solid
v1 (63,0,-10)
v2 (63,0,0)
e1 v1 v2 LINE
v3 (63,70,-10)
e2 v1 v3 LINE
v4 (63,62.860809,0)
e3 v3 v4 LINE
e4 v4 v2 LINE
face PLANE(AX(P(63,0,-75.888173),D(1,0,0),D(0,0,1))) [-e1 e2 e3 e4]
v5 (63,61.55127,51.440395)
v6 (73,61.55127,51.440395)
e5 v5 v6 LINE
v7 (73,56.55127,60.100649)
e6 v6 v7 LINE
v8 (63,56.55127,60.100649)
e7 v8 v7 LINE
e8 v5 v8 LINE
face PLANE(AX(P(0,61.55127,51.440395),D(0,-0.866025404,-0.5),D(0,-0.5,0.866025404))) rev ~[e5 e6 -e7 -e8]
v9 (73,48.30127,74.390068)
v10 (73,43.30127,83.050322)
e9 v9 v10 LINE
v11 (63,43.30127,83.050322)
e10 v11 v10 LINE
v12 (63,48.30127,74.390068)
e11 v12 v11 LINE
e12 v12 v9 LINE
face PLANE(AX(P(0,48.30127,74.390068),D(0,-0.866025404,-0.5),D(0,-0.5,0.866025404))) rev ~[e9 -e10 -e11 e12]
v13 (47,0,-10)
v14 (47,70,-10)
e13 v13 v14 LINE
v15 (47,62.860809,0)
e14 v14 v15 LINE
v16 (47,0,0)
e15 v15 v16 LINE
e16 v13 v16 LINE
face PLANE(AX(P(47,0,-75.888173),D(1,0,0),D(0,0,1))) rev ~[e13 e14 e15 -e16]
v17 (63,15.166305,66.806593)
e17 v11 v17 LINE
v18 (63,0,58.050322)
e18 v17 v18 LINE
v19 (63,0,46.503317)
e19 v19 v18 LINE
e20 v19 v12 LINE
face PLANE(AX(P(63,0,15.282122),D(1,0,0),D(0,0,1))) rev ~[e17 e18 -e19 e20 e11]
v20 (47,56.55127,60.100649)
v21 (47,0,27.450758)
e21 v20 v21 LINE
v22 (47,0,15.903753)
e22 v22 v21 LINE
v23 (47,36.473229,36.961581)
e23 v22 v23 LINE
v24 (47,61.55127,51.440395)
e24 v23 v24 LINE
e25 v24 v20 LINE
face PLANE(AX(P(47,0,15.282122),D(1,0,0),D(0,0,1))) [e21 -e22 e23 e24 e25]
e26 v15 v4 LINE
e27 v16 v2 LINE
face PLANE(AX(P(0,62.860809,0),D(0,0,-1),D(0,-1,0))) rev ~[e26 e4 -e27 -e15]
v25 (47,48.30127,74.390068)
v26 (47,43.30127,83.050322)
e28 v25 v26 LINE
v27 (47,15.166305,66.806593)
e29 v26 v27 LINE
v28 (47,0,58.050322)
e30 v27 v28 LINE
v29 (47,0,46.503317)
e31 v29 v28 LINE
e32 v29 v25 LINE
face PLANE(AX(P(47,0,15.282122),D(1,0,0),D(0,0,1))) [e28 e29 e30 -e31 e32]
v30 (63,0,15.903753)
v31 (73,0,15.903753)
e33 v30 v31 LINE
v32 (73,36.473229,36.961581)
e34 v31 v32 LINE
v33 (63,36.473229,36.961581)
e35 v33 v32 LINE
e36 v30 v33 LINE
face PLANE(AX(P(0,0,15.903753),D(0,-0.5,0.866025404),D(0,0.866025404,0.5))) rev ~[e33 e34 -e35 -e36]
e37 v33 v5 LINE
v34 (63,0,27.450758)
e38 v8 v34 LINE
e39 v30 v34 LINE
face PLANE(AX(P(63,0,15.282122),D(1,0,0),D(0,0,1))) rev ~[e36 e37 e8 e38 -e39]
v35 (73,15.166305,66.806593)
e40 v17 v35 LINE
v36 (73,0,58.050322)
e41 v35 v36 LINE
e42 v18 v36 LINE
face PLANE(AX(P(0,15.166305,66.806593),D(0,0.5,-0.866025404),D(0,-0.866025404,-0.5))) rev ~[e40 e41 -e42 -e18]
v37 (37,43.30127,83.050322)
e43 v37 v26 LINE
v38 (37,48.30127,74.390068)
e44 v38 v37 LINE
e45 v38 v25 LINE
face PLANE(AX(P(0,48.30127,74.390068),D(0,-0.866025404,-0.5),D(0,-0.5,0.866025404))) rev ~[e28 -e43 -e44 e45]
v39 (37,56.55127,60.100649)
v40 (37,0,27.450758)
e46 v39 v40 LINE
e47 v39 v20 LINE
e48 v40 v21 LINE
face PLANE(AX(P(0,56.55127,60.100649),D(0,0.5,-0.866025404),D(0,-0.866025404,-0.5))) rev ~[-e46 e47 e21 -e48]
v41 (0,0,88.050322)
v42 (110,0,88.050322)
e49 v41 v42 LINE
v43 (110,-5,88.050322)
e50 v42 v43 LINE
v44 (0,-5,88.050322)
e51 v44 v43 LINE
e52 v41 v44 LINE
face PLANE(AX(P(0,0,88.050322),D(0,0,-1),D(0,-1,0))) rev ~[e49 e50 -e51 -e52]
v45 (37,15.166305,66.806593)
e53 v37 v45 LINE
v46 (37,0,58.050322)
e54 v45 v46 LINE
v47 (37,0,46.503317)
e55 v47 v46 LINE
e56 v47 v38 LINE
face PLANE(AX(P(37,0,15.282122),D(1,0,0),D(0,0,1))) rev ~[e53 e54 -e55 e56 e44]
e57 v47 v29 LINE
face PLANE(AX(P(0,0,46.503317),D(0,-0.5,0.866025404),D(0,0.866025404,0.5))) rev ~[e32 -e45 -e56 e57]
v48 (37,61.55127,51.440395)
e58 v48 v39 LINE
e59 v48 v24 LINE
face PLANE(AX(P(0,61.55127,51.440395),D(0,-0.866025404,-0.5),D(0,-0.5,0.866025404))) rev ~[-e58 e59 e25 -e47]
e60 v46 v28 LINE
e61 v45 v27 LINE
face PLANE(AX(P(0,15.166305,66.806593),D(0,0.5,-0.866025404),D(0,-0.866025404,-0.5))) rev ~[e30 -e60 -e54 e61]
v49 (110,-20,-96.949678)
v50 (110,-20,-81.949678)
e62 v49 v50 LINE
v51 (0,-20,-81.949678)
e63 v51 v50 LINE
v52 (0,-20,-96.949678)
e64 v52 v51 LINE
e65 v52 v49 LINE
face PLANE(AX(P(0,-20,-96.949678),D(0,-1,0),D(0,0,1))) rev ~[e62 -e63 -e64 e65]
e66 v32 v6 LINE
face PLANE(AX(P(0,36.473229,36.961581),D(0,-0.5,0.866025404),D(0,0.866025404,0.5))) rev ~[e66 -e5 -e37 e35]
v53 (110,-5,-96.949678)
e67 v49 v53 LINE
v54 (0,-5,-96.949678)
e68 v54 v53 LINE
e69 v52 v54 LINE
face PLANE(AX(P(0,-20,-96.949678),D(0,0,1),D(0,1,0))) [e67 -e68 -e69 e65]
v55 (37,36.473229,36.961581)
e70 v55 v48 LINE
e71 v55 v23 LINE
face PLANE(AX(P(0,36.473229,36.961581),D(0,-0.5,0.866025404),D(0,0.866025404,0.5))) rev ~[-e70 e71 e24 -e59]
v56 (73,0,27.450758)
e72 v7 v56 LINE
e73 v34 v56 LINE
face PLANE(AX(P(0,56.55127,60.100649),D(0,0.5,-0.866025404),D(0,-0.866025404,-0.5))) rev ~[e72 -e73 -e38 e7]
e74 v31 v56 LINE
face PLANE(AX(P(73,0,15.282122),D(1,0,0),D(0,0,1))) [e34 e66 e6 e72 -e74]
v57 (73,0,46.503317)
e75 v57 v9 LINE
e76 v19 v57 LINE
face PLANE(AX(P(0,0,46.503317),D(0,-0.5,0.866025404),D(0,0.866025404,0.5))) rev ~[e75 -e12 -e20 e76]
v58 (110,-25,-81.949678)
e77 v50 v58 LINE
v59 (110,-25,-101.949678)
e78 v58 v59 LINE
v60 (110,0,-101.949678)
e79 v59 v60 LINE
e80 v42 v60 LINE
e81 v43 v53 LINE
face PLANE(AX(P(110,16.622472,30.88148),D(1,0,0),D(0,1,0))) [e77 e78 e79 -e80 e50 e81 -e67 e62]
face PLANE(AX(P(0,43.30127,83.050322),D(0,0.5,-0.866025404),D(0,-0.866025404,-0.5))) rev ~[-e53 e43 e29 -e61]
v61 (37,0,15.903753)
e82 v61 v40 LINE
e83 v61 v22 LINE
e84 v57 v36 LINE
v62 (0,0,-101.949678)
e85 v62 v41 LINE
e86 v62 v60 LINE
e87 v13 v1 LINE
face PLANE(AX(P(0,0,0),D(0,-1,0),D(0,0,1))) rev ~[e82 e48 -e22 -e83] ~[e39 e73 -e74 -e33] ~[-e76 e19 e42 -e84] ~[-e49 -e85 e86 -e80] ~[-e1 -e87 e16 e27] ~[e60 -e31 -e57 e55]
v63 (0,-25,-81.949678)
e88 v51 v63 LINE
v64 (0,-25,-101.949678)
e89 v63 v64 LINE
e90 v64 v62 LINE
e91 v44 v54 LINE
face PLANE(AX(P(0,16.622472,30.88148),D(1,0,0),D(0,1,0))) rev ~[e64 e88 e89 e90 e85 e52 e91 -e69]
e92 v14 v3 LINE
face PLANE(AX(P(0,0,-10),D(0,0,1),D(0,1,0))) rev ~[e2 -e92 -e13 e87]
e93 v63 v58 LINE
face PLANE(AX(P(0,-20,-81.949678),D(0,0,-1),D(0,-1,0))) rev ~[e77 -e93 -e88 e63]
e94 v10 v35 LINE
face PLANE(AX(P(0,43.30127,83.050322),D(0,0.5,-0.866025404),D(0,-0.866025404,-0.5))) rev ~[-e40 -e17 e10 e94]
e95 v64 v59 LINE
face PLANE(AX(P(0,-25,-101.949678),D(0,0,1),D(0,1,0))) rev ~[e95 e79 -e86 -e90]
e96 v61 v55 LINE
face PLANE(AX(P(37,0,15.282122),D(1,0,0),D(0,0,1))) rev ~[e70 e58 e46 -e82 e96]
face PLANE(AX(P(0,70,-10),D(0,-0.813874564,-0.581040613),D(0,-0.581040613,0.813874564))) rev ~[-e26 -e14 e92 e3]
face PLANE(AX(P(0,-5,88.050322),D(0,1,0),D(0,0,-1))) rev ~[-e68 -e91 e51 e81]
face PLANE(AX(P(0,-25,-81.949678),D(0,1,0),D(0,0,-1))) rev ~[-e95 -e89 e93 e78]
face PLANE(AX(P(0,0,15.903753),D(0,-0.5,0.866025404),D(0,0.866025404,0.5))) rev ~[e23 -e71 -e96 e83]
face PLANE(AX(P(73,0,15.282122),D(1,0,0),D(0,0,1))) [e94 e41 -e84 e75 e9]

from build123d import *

# Parameters (mm, degrees)
F0_W     = 15
F0_H     = 5
F1_DEPTH = 110
F2_W     = 8
F2_H     = 98.8297045976
F2_W_2   = 37
F2_H_2   = 91.1702954024
F2_W_3   = 10
F3_DEPTH = 100


# Not quite as in the source:
# - a feature of the source that left no trace in its solid (it failed there, or was rolled back) is left out


with BuildPart() as f1:
    # F0 (on Right) → F1 (new body)
    with BuildSketch(Plane.YZ):
        Polygon((30.635715595, 45.1382968587), (0, 27.4507582131), (0, 15.9037528294), (36.4732290688, 36.9615814504), align=None)
        Polygon((56.5512701892, 60.1006492799), (30.635715595, 45.1382968587), (36.4732290688, 36.9615814504), (61.5512701892, 51.4403952421), align=None)
        Polygon((15.1663048896, 66.8065926908), (0, 58.0503224802), (0, 46.5033170964), (21.0038183633, 58.6298772825), align=None)
        Polygon((43.3012701892, 83.0503224802), (15.1663048896, 66.8065926908), (21.0038183633, 58.6298772825), (48.3012701892, 74.3900684424), align=None)
        Polygon((-20, -101.9496775198), (-20, -96.9496775198), (-20, -81.9496775198), (-25, -81.9496775198), (-25, -101.9496775198), align=None)
        with Locations((-12.5, -99.4496775198)):
            Rectangle(F0_W, F0_H)
        Polygon((0, 88.0503224802), (-5, 88.0503224802), (-5, -96.9496775198), (-5, -101.9496775198), (0, -101.9496775198), (0, -10), (0, 0), (0, 15.9037528294), (0, 27.4507582131), (0, 46.5033170964), (0, 58.0503224802), align=None)
        Polygon((0, 0), (0, -10), (70, -10), (62.860808794, 0), align=None)
    extrude(amount=F1_DEPTH)

    # F2 (on Front) → F3 (cut)
    with BuildSketch(Plane.XZ):
        with Locations((51, 64.6969747171)):
            Rectangle(F2_W, F2_H)
        with Locations((59, 64.6969747171)):
            Rectangle(F2_W, F2_H)
        with Locations((91.5, -30.3030252829)):
            Rectangle(F2_W_2, F2_H_2)
        with Locations((18.5, -30.3030252829)):
            Rectangle(F2_W_2, F2_H_2)
        with Locations((42, -30.3030252829)):
            Rectangle(F2_W_3, F2_H_2)
        with Locations((68, -30.3030252829)):
            Rectangle(F2_W_3, F2_H_2)
        with Locations((91.5, 64.6969747171)):
            Rectangle(F2_W_2, F2_H)
        with Locations((18.5, 64.6969747171)):
            Rectangle(F2_W_2, F2_H)
    extrude(amount=-F3_DEPTH, mode=Mode.SUBTRACT)


solid = f1.part
